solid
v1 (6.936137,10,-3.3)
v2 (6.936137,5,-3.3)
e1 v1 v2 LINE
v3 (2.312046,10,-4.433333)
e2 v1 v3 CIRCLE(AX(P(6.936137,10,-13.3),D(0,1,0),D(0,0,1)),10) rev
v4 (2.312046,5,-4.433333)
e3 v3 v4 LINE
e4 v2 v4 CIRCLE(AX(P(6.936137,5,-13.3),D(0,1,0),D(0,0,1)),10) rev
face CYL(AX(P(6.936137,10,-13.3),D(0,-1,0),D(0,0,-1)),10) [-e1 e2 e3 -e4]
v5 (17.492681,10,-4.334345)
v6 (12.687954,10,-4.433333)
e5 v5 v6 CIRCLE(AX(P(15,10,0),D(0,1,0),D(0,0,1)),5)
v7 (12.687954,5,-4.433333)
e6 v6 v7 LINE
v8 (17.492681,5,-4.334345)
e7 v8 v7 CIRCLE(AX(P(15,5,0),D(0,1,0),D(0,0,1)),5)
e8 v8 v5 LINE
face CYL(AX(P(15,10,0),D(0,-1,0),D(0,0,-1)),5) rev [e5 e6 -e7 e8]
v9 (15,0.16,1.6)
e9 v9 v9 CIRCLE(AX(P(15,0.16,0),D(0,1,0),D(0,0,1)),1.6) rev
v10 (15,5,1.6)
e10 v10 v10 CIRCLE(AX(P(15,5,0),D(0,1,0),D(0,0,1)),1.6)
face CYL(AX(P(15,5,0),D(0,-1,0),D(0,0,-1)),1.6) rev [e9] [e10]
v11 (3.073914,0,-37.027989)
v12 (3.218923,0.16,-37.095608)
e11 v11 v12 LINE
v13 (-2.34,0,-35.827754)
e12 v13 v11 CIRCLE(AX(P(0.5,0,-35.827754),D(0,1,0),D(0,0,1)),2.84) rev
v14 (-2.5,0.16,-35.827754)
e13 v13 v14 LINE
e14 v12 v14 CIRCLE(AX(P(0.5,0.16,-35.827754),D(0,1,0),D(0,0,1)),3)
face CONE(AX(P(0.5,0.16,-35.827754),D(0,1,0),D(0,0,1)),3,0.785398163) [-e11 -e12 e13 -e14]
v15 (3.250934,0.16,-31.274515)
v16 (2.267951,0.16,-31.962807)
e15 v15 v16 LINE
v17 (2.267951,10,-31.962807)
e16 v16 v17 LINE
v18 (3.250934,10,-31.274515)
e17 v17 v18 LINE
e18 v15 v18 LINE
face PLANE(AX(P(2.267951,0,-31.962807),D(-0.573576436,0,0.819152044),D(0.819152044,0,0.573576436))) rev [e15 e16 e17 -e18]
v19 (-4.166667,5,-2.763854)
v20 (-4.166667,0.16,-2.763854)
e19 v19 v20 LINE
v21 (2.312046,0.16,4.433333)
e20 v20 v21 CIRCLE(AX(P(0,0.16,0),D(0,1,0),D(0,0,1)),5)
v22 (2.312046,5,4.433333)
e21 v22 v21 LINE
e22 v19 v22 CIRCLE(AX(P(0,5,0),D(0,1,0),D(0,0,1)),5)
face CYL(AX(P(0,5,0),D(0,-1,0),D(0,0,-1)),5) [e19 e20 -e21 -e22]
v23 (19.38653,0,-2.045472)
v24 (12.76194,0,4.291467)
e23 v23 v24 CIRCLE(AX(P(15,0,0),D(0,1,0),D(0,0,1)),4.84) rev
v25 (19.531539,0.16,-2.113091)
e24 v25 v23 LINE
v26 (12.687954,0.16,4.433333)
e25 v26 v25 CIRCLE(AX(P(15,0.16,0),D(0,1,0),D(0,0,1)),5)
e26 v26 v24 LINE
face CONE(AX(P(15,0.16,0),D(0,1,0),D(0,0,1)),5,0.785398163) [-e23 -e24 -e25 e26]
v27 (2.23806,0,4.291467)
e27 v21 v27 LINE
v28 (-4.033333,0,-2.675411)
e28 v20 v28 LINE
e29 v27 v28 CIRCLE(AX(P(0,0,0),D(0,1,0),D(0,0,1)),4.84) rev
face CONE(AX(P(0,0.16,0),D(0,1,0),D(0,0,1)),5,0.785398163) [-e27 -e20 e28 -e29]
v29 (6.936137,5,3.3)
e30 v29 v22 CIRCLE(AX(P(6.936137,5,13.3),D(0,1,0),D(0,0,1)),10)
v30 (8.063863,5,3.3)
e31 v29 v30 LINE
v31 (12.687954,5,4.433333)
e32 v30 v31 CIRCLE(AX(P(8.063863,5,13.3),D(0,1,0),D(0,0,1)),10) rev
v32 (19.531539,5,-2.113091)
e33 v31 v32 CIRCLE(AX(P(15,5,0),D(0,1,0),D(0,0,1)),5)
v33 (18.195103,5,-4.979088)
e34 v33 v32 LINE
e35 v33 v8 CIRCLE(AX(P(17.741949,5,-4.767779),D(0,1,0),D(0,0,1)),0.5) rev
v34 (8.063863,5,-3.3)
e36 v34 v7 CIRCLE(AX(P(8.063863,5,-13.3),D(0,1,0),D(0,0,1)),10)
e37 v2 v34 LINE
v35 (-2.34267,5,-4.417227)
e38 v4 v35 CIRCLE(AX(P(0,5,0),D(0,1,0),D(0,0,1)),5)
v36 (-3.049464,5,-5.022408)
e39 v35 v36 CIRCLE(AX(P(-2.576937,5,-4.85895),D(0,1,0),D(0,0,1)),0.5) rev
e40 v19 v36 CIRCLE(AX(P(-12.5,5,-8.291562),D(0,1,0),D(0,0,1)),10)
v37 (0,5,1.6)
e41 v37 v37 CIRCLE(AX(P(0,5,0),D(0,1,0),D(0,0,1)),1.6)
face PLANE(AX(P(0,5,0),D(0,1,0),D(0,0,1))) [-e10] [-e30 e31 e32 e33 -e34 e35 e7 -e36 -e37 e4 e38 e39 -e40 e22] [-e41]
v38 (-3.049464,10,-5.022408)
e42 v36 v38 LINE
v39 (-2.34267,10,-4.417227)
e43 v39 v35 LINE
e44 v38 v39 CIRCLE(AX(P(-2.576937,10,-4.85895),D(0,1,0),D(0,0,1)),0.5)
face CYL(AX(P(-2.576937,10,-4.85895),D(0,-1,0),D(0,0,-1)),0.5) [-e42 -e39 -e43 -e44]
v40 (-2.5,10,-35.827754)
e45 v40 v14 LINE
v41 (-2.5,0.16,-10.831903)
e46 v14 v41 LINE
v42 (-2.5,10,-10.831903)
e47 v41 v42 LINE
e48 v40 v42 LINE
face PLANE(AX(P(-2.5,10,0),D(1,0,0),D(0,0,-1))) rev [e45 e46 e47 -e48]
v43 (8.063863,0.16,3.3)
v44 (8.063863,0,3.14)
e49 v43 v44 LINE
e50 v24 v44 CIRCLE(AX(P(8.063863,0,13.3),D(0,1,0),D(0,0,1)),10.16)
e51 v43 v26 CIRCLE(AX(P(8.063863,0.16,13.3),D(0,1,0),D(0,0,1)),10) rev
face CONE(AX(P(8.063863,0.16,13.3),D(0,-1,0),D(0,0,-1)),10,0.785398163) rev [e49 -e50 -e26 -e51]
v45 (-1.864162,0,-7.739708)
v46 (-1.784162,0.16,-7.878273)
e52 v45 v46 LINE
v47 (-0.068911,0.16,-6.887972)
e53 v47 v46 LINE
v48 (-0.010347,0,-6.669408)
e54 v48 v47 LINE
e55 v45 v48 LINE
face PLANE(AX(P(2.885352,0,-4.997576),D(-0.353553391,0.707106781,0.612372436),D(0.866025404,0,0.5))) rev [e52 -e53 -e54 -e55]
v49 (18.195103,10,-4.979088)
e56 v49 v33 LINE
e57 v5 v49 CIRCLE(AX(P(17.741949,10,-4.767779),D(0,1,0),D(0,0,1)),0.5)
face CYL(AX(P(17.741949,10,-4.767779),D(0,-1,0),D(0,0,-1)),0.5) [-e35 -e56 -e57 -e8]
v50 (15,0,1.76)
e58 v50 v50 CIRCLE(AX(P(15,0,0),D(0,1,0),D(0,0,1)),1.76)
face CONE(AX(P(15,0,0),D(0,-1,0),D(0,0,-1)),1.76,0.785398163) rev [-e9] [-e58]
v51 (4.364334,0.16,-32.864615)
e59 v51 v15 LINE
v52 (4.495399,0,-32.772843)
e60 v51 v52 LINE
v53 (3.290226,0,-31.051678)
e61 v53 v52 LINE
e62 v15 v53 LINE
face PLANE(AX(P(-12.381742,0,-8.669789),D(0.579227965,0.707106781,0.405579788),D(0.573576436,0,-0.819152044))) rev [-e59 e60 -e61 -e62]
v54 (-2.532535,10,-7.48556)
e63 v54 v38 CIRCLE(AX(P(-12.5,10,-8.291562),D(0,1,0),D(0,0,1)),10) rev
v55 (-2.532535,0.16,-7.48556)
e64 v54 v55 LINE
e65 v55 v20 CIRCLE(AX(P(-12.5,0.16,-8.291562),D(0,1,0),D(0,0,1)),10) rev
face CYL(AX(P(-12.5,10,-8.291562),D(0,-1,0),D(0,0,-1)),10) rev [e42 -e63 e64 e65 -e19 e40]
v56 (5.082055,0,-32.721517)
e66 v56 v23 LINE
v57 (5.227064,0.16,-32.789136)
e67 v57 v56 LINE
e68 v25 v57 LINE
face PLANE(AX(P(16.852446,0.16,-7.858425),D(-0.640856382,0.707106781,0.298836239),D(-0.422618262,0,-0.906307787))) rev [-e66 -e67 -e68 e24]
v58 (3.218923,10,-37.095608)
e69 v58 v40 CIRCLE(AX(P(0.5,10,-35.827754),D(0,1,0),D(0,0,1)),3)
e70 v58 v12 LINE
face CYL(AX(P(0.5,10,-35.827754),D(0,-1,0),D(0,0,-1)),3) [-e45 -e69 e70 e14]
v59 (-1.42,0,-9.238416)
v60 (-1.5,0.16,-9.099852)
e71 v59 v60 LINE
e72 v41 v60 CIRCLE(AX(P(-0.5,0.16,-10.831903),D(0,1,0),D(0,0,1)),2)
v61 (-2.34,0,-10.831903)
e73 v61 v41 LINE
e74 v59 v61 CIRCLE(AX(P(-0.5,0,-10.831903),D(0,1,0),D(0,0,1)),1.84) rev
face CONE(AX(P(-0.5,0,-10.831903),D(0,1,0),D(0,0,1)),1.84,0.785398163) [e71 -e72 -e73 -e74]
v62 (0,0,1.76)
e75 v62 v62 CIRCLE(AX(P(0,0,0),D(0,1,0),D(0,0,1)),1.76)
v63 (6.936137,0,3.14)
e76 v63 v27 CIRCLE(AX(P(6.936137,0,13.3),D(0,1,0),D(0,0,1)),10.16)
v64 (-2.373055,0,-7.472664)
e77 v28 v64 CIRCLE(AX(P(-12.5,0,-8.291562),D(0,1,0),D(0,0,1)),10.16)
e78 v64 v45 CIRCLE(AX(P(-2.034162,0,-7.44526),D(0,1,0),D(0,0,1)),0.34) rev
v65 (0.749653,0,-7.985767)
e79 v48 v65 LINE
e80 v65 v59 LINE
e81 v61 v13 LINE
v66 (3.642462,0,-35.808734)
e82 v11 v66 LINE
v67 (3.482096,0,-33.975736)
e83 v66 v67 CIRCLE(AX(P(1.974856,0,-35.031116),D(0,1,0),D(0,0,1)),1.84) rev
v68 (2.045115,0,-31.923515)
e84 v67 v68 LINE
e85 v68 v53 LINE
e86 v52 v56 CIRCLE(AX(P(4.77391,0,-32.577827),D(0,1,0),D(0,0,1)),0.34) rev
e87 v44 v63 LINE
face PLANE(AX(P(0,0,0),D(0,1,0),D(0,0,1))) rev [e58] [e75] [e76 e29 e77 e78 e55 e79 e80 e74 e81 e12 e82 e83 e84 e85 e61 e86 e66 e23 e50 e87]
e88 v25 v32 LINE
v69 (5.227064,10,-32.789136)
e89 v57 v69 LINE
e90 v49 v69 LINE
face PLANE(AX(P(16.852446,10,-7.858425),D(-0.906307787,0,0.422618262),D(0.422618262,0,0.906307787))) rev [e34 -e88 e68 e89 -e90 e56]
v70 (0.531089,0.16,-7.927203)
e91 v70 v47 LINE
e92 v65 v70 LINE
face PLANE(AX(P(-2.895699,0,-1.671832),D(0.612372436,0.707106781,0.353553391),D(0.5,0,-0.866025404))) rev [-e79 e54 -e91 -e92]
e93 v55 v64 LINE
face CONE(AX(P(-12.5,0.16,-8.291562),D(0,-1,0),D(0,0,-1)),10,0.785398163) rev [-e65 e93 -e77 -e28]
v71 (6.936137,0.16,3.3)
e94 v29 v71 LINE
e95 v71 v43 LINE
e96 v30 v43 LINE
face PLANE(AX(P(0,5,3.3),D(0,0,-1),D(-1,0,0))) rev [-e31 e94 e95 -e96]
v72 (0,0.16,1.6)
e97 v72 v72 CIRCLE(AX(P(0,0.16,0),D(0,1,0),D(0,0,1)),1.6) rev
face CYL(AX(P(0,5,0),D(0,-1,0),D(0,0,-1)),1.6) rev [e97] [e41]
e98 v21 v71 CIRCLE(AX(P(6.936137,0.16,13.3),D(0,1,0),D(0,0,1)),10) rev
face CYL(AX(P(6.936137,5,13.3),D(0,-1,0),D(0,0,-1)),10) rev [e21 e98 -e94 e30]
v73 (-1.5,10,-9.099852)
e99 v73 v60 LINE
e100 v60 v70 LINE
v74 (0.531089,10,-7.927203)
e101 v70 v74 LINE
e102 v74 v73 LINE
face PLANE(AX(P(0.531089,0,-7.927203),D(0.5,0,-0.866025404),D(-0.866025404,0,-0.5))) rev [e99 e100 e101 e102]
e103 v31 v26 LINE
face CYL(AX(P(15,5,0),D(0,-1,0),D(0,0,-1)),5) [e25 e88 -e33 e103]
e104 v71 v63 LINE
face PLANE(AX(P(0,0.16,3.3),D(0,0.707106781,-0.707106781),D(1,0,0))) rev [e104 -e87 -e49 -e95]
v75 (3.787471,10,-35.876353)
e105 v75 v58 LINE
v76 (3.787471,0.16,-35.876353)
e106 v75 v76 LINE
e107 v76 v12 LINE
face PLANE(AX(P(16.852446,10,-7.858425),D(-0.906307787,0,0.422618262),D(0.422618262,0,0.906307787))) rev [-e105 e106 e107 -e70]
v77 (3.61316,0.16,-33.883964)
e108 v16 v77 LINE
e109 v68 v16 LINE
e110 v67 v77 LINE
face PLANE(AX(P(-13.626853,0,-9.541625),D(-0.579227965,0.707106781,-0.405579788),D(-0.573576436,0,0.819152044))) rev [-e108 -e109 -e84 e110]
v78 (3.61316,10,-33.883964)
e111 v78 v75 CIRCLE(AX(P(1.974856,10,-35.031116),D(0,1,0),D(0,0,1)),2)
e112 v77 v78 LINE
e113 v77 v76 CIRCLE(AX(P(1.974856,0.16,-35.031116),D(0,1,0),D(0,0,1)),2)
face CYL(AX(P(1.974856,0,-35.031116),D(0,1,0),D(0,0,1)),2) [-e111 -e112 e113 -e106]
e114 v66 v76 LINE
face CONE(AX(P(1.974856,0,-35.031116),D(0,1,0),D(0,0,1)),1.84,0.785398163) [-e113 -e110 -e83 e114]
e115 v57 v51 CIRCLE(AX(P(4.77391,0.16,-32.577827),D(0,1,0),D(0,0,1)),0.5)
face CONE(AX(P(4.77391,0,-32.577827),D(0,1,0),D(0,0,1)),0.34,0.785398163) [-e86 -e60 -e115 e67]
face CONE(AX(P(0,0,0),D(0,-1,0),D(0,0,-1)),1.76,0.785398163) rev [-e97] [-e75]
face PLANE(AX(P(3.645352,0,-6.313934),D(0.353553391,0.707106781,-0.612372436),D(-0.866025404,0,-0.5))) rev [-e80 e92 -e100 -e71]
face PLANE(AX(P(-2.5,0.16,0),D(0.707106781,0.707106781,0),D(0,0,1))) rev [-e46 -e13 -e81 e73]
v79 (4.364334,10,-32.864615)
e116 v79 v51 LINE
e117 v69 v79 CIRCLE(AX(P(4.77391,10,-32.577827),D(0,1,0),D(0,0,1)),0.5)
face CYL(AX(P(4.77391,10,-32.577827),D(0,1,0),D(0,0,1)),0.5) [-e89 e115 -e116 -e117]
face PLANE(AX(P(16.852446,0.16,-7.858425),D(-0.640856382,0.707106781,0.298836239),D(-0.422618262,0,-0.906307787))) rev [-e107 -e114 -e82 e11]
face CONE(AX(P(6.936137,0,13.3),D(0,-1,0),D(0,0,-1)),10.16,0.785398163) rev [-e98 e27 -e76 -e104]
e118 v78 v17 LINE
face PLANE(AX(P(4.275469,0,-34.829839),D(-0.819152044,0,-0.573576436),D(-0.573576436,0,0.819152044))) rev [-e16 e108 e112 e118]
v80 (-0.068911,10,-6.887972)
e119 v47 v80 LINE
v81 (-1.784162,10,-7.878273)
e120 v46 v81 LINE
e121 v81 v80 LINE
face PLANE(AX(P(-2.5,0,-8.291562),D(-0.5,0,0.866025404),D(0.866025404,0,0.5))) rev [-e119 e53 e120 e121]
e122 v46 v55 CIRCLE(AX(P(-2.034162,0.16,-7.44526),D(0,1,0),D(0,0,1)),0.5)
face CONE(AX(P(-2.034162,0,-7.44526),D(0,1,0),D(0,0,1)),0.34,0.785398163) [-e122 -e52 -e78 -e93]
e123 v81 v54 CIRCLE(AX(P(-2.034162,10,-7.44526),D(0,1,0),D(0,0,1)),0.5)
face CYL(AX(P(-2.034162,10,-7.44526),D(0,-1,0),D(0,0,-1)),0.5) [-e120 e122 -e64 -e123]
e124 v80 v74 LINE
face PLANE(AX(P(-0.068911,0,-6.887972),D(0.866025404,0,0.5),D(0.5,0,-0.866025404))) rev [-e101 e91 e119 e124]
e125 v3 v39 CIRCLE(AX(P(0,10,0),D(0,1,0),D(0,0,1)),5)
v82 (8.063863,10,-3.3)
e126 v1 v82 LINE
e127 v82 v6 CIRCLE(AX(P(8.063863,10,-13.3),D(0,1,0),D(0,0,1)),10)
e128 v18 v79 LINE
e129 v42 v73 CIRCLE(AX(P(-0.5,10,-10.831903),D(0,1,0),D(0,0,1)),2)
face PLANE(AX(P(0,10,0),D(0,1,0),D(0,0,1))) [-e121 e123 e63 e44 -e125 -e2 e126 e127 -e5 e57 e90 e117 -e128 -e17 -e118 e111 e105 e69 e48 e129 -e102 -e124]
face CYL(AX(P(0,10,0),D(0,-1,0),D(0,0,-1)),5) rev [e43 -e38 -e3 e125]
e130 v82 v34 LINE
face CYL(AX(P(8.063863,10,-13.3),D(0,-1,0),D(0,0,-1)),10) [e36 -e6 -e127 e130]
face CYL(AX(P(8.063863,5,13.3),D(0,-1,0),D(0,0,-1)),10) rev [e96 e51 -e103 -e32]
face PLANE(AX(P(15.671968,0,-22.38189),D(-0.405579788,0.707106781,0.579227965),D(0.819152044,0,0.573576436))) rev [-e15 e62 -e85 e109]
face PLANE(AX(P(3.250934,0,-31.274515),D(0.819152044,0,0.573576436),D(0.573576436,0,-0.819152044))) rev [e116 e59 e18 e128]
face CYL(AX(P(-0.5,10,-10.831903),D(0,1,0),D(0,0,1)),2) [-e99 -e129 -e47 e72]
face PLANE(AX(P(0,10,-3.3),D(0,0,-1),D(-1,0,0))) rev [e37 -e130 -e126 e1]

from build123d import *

# Parameters (mm, degrees)
MAIN_BODY_DEPTH                           = 10
SKETCH1_3_R                               = 1.6
CONNECTOR_BODY_DEPTH                      = 5
DULLING_FILLET_START                      = 5
DULLING_FILLET_DEPTH                      = 6
CUT_EXTRUDE1_DEPTH                        = 45.806187552
FILLET1_R                                 = 2
FILLET2_R                                 = 0.5
ELEPHANTSFOOT_COMPENSATION_LEFT_CONF_SIZE = 0.16


with BuildPart() as part:
    # complete_sketch → main_body (new body)
    with BuildSketch(Plane(origin=(0, 0, 0), x_dir=(1, 0, 0), z_dir=(0, 1, 0))):
        with BuildLine():
            ThreePointArc((-2.5, 8.291561976), (-2.925728922, 5.40481063), (-4.166666667, 2.763853992))
            ThreePointArc((-4.166666667, 2.763853992), (-1.24767584, 4.841828683), (2.312045751, 4.433333333))
            ThreePointArc((2.312045751, 4.433333333), (4.555661111, 3.587465144), (6.936137254, 3.3))
            Line((6.936137254, 3.3), (8.063862746, 3.3))
            ThreePointArc((8.063862746, 3.3), (10.444338889, 3.587465144), (12.687954249, 4.433333333))
            ThreePointArc((12.687954249, 4.433333333), (16.605433979, 4.735248857), (19.531538935, 2.113091309))
            Line((19.531538935, 2.113091309), (3.218923361, 37.095608299))
            ThreePointArc((3.218923361, 37.095608299), (-0.149318842, 38.756641535), (-2.5, 35.827753514))
            Line((-2.5, 35.827753514), (-2.5, 8.291561976))
        make_face()
    extrude(amount=MAIN_BODY_DEPTH)

    # Sketch1<3> → connector_body (add)
    with BuildSketch(Plane(origin=(0, 0, 0), x_dir=(1, 0, 0), z_dir=(0, 1, 0))):
        with BuildLine():
            ThreePointArc((2.312045751, -4.433333333), (4.555661111, -3.587465144), (6.936137254, -3.3))
            Line((6.936137254, -3.3), (8.063862746, -3.3))
            ThreePointArc((8.063862746, -3.3), (10.444338889, -3.587465144), (12.687954249, -4.433333333))
            ThreePointArc((12.687954249, -4.433333333), (18.456219958, -3.613107195), (19.531538935, 2.113091309))
            ThreePointArc((19.531538935, 2.113091309), (16.605433979, 4.735248857), (12.687954249, 4.433333333))
            ThreePointArc((12.687954249, 4.433333333), (10.444338889, 3.587465144), (8.063862746, 3.3))
            Line((8.063862746, 3.3), (6.936137254, 3.3))
            ThreePointArc((6.936137254, 3.3), (4.555661111, 3.587465144), (2.312045751, 4.433333333))
            ThreePointArc((2.312045751, 4.433333333), (-1.24767584, 4.841828683), (-4.166666667, 2.763853992))
            ThreePointArc((-4.166666667, 2.763853992), (-3.716151374, -3.345178466), (2.312045751, -4.433333333))
        make_face()
        with Locations(Location((0, 0, 0), (0, 0, 270))):
            Circle(SKETCH1_3_R, mode=Mode.SUBTRACT)
        with Locations(Location((15, 0, 0), (0, 0, 270))):
            Circle(SKETCH1_3_R, mode=Mode.SUBTRACT)
    extrude(amount=CONNECTOR_BODY_DEPTH)

    # dulling_fillet: read off the stored shape, not the designer's step
    # dulling_fillet outline → dulling_fillet (cut)
    with BuildSketch(Plane(origin=(0, 0, 0), x_dir=(1, 0, 0), z_dir=(0, 1, 0)).offset(DULLING_FILLET_START)):
        with BuildLine():
            Line((19.531538935, 2.113091309), (18.195102647, 4.979088177))
            ThreePointArc((18.195102647, 4.979088177), (18.080055144, 4.399425861), (17.492680685, 4.334344587))
            ThreePointArc((17.492680685, 4.334344587), (18.683531845, 3.381063908), (19.531538935, 2.113091309))
        make_face()
        with BuildLine():
            ThreePointArc((-4.166666667, 2.763853992), (-3.358016887, 3.704554303), (-2.342670216, 4.417227214))
            ThreePointArc((-2.342670216, 4.417227214), (-2.902133749, 4.479151002), (-3.049464036, 5.022407651))
            ThreePointArc((-3.049464036, 5.022407651), (-3.536643042, 3.85780149), (-4.166666667, 2.763853992))
        make_face()
    extrude(amount=DULLING_FILLET_DEPTH, mode=Mode.SUBTRACT)

    # Sketch2 → Cut-Extrude1 (cut, through all)
    with BuildSketch(Plane(origin=(0, 10, 0), x_dir=(1, 0, 0), z_dir=(0, 1, 0))):
        Polygon((-2.5, 8.291561976), (-0.068911087, 6.887972137), (0.531088913, 7.927202622), (-2.5, 9.677202622), align=None)
        Polygon((4.275469015, 34.829838831), (2.267951488, 31.962806676), (3.250933941, 31.274514953), (4.861066057, 33.574021924), align=None)
    extrude(amount=-CUT_EXTRUDE1_DEPTH, mode=Mode.SUBTRACT)

    # Fillet1
    fillet1_edges = [part.edges().sort_by_distance(p)[0] for p in [
        (-2.5, 5, -9.677202622),
        (4.275469015, 5, -34.829838831),
    ]]
    fillet(fillet1_edges, radius=FILLET1_R)

    # Fillet2
    fillet2_edges = [part.edges().sort_by_distance(p)[0] for p in [
        (4.861066057, 5, -33.574021924),
        (-2.5, 5, -8.291561976),
    ]]
    fillet(fillet2_edges, radius=FILLET2_R)

    # elephantsfoot_compensation_left_conf
    elephantsfoot_compensation_left_conf_edges = [part.edges().sort_by_distance(p)[0] for p in [
        (0.231088913, 0, -7.40758738),
        (3.807634117, 0, -32.069565198),
        (2.759442715, 0, -31.618660815),
        (-2.5, 0, -23.329828337),
        (2.940555742, 0, -32.923385101),
        (-0.149318842, 0, -38.756641535),
        (3.503197421, 0, -36.48598061),
        (-2.232050808, 0, -9.83190316),
        (3.967245303, 0, -34.856804912),
        (12.379301571, 0, -17.451113833),
        (-3.049950658, 0, -5.021001256),
        (-0.926536362, 0, -7.383122321),
        (-2.266493544, 0, -7.888003391),
        (4.817488185, 0, -33.075924575),
        (-3.716151374, 0, 3.345178466),
        (18.456219958, 0, 3.613107195),
        (7.5, 0, 3.3),
        (10.444338889, 0, 3.587465144),
        (0, 0, -1.6),
        (15, 0, -1.6),
        (4.555661111, 0, 3.587465144),
        (-0.484455543, 0, -8.513527487),
    ]]
    chamfer(elephantsfoot_compensation_left_conf_edges, length=ELEPHANTSFOOT_COMPENSATION_LEFT_CONF_SIZE)


solid = part.part
